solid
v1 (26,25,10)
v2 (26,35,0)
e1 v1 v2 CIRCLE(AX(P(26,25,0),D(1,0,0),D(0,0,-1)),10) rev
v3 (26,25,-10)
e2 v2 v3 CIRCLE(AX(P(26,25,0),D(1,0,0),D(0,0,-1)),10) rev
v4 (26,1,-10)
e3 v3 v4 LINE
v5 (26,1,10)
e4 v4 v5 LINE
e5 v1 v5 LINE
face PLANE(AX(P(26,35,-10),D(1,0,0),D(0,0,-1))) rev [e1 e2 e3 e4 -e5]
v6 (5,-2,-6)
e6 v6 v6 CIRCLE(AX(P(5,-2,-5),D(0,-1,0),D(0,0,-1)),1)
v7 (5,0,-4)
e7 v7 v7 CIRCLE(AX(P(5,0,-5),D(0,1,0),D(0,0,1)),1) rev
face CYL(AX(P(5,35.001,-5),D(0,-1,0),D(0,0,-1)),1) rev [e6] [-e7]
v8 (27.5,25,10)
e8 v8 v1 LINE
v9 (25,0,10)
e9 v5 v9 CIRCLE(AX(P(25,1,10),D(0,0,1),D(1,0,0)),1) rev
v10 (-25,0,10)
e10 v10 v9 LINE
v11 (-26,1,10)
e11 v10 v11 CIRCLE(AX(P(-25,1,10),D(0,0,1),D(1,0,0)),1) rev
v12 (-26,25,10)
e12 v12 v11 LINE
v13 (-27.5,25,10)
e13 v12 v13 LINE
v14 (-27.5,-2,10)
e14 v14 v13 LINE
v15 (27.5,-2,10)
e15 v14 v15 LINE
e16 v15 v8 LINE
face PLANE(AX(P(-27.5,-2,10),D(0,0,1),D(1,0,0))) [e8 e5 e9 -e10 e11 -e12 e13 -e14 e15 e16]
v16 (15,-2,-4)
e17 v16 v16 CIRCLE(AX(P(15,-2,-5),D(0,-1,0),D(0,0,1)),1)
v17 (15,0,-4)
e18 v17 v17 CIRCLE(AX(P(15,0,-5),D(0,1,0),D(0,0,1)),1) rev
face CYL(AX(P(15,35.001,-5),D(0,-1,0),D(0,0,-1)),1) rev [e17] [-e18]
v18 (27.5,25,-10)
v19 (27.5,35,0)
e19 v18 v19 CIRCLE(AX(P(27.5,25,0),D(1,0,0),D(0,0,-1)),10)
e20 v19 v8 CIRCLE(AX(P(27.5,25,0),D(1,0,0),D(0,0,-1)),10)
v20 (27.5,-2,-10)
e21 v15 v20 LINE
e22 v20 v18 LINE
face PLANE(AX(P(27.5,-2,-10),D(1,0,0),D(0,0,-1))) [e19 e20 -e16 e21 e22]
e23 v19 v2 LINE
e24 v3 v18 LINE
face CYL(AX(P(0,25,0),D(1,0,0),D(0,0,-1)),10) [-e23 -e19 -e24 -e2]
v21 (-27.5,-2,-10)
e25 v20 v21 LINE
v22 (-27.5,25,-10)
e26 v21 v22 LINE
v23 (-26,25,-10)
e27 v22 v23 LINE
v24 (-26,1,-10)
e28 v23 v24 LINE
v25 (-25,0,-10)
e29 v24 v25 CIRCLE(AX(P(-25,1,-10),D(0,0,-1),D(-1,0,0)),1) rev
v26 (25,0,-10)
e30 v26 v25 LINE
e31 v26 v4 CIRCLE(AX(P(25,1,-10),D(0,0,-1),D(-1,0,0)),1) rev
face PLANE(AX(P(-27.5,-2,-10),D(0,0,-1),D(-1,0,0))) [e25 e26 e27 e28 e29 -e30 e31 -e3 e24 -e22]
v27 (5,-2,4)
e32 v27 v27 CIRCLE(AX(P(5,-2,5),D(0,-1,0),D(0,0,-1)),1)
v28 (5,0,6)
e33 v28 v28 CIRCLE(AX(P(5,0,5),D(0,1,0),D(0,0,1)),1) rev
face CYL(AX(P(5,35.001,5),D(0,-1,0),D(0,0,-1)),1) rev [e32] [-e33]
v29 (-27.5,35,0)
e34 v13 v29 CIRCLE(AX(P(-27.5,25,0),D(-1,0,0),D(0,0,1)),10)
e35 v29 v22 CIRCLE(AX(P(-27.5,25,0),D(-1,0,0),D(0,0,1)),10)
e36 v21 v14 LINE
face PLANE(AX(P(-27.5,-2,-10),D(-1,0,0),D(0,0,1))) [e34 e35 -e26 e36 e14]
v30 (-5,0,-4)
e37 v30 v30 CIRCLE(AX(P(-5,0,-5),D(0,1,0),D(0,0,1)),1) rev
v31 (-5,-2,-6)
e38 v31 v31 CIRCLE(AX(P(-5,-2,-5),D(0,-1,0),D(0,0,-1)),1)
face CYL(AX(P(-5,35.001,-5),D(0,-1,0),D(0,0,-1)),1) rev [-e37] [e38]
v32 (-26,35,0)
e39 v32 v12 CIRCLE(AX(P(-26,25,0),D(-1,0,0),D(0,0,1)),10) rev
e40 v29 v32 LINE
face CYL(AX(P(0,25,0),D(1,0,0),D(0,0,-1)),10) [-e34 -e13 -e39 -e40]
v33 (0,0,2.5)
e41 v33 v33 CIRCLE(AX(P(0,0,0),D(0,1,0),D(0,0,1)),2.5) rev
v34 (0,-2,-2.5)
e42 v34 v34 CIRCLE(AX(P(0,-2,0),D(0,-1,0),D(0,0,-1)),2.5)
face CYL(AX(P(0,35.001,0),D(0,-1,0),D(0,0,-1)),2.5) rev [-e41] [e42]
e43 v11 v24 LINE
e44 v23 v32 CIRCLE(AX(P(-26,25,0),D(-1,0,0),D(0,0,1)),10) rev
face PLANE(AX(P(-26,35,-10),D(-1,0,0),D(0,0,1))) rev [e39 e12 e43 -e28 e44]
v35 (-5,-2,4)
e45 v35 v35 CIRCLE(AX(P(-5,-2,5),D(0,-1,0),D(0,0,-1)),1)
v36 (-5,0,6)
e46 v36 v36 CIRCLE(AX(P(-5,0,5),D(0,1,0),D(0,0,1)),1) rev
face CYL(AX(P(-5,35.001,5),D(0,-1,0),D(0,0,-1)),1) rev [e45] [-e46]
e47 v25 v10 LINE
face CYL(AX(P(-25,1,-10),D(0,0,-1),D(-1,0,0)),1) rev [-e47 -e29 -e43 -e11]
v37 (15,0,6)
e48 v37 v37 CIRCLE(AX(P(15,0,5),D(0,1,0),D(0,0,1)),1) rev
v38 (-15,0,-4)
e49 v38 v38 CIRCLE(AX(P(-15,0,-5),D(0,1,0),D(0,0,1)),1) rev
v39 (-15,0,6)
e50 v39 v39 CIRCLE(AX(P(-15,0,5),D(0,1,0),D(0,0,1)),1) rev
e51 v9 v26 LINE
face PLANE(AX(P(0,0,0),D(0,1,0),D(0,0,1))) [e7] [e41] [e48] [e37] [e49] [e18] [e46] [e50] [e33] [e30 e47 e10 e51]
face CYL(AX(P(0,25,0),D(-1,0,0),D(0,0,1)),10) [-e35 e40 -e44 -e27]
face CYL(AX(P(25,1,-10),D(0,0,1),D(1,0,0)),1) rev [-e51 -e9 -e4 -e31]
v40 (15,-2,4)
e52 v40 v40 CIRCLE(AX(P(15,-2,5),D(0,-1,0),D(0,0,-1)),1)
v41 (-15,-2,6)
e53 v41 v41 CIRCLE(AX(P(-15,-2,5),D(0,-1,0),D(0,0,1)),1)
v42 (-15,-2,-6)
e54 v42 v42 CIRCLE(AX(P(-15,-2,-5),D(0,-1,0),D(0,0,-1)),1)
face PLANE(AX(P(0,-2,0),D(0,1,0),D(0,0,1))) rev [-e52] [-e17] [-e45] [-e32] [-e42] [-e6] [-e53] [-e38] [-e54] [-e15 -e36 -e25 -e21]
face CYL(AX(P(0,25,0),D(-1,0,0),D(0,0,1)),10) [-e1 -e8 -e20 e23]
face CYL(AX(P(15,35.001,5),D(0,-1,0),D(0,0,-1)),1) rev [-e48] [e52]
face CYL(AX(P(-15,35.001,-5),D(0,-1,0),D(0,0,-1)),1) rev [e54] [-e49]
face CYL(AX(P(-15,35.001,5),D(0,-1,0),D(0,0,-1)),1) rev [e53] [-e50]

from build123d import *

# Parameters (mm, degrees)
SKETCH_1_W          = 55
SKETCH_1_H          = 20
EXTRUDE_1_DEPTH     = 2
SKETCH_3_W          = 1.5
SKETCH_3_H          = 20
EXTRUDE_2_DEPTH     = 35
FILLET_1_R          = 10
FILLET_3_R          = 1
CUT_EXTRUDE_1_REACH = 49.173
SKETCH_6_R          = 2.5
SKETCH_6_R_2        = 1


with BuildPart() as part:
    # 草图1 → 凸台-拉伸1 (new body)
    with BuildSketch(Plane(origin=(0, 0, 0), x_dir=(1, 0, 0), z_dir=(0, 1, 0))):
        Rectangle(SKETCH_1_W, SKETCH_1_H)
    extrude(amount=-EXTRUDE_1_DEPTH)

    # 草图3 → 凸台-拉伸2 (add)
    with BuildSketch(Plane(origin=(0, 0, 0), x_dir=(1, 0, 0), z_dir=(0, 1, 0))):
        with Locations((-26.75, 0)):
            Rectangle(SKETCH_3_W, SKETCH_3_H)
        with Locations((26.75, 0)):
            Rectangle(SKETCH_3_W, SKETCH_3_H)
    extrude(amount=EXTRUDE_2_DEPTH)

    # 圆角1
    fillet_1_edges = [part.edges().sort_by_distance(p)[0] for p in [
        (-26.75, 35, -10),
        (-26.75, 35, 10),
        (26.75, 35, 10),
        (26.75, 35, -10),
    ]]
    fillet(fillet_1_edges, radius=FILLET_1_R - 0.0001)  # a hair under: the kernel refuses the full size

    # 圆角3
    fillet_3_edges = [part.edges().sort_by_distance(p)[0] for p in [
        (-26, 0, 0),
        (26, 0, 0),
    ]]
    fillet(fillet_3_edges, radius=FILLET_3_R)

    # 草图6 → 切除-拉伸1 (cut, up to next)
    with BuildSketch(Plane.XZ.offset(2), mode=Mode.PRIVATE) as cut_extrude_1_sk1:
        with Locations(Location((0, 0, 0), (0, 0, 270))):
            Circle(SKETCH_6_R)
    cut_extrude_1_tool1 = extrude(cut_extrude_1_sk1.sketch, amount=-CUT_EXTRUDE_1_REACH, mode=Mode.PRIVATE) & part.part
    # 草图6 → 切除-拉伸1 (cut, up to next)
    with BuildSketch(Plane.XZ.offset(2), mode=Mode.PRIVATE) as cut_extrude_1_sk2:
        with Locations(Location((-5, 5, 0), (0, 0, 270))):
            Circle(SKETCH_6_R_2)
    cut_extrude_1_tool2 = extrude(cut_extrude_1_sk2.sketch, amount=-CUT_EXTRUDE_1_REACH, mode=Mode.PRIVATE) & part.part
    # 草图6 → 切除-拉伸1 (cut, up to next)
    with BuildSketch(Plane.XZ.offset(2), mode=Mode.PRIVATE) as cut_extrude_1_sk3:
        with Locations(Location((-5, -5, 0), (0, 0, 270))):
            Circle(SKETCH_6_R_2)
    cut_extrude_1_tool3 = extrude(cut_extrude_1_sk3.sketch, amount=-CUT_EXTRUDE_1_REACH, mode=Mode.PRIVATE) & part.part
    # 草图6 → 切除-拉伸1 (cut, up to next)
    with BuildSketch(Plane.XZ.offset(2), mode=Mode.PRIVATE) as cut_extrude_1_sk4:
        with Locations(Location((5, -5, 0), (0, 0, 270))):
            Circle(SKETCH_6_R_2)
    cut_extrude_1_tool4 = extrude(cut_extrude_1_sk4.sketch, amount=-CUT_EXTRUDE_1_REACH, mode=Mode.PRIVATE) & part.part
    # 草图6 → 切除-拉伸1 (cut, up to next)
    with BuildSketch(Plane.XZ.offset(2), mode=Mode.PRIVATE) as cut_extrude_1_sk5:
        with Locations(Location((5, 5, 0), (0, 0, 270))):
            Circle(SKETCH_6_R_2)
    cut_extrude_1_tool5 = extrude(cut_extrude_1_sk5.sketch, amount=-CUT_EXTRUDE_1_REACH, mode=Mode.PRIVATE) & part.part
    # 草图6 → 切除-拉伸1 (cut, up to next)
    with BuildSketch(Plane.XZ.offset(2), mode=Mode.PRIVATE) as cut_extrude_1_sk6:
        with Locations(Location((15, 5, 0), (0, 0, 270))):
            Circle(SKETCH_6_R_2)
    cut_extrude_1_tool6 = extrude(cut_extrude_1_sk6.sketch, amount=-CUT_EXTRUDE_1_REACH, mode=Mode.PRIVATE) & part.part
    # 草图6 → 切除-拉伸1 (cut, up to next)
    with BuildSketch(Plane.XZ.offset(2), mode=Mode.PRIVATE) as cut_extrude_1_sk7:
        with Locations(Location((-15, 5, 0), (0, 0, 90))):
            Circle(SKETCH_6_R_2)
    cut_extrude_1_tool7 = extrude(cut_extrude_1_sk7.sketch, amount=-CUT_EXTRUDE_1_REACH, mode=Mode.PRIVATE) & part.part
    # 草图6 → 切除-拉伸1 (cut, up to next)
    with BuildSketch(Plane.XZ.offset(2), mode=Mode.PRIVATE) as cut_extrude_1_sk8:
        with Locations(Location((15, -5, 0), (0, 0, 90))):
            Circle(SKETCH_6_R_2)
    cut_extrude_1_tool8 = extrude(cut_extrude_1_sk8.sketch, amount=-CUT_EXTRUDE_1_REACH, mode=Mode.PRIVATE) & part.part
    # 草图6 → 切除-拉伸1 (cut, up to next)
    with BuildSketch(Plane.XZ.offset(2), mode=Mode.PRIVATE) as cut_extrude_1_sk9:
        with Locations(Location((-15, -5, 0), (0, 0, 270))):
            Circle(SKETCH_6_R_2)
    cut_extrude_1_tool9 = extrude(cut_extrude_1_sk9.sketch, amount=-CUT_EXTRUDE_1_REACH, mode=Mode.PRIVATE) & part.part
    add(cut_extrude_1_tool1.solids().sort_by_distance((0, -2, 0))[0], mode=Mode.SUBTRACT)
    add(cut_extrude_1_tool2.solids().sort_by_distance((-5, -2, 5))[0], mode=Mode.SUBTRACT)
    add(cut_extrude_1_tool3.solids().sort_by_distance((-5, -2, -5))[0], mode=Mode.SUBTRACT)
    add(cut_extrude_1_tool4.solids().sort_by_distance((5, -2, -5))[0], mode=Mode.SUBTRACT)
    add(cut_extrude_1_tool5.solids().sort_by_distance((5, -2, 5))[0], mode=Mode.SUBTRACT)
    add(cut_extrude_1_tool6.solids().sort_by_distance((15, -2, 5))[0], mode=Mode.SUBTRACT)
    add(cut_extrude_1_tool7.solids().sort_by_distance((-15, -2, 5))[0], mode=Mode.SUBTRACT)
    add(cut_extrude_1_tool8.solids().sort_by_distance((15, -2, -5))[0], mode=Mode.SUBTRACT)
    add(cut_extrude_1_tool9.solids().sort_by_distance((-15, -2, -5))[0], mode=Mode.SUBTRACT)


solid = part.part
